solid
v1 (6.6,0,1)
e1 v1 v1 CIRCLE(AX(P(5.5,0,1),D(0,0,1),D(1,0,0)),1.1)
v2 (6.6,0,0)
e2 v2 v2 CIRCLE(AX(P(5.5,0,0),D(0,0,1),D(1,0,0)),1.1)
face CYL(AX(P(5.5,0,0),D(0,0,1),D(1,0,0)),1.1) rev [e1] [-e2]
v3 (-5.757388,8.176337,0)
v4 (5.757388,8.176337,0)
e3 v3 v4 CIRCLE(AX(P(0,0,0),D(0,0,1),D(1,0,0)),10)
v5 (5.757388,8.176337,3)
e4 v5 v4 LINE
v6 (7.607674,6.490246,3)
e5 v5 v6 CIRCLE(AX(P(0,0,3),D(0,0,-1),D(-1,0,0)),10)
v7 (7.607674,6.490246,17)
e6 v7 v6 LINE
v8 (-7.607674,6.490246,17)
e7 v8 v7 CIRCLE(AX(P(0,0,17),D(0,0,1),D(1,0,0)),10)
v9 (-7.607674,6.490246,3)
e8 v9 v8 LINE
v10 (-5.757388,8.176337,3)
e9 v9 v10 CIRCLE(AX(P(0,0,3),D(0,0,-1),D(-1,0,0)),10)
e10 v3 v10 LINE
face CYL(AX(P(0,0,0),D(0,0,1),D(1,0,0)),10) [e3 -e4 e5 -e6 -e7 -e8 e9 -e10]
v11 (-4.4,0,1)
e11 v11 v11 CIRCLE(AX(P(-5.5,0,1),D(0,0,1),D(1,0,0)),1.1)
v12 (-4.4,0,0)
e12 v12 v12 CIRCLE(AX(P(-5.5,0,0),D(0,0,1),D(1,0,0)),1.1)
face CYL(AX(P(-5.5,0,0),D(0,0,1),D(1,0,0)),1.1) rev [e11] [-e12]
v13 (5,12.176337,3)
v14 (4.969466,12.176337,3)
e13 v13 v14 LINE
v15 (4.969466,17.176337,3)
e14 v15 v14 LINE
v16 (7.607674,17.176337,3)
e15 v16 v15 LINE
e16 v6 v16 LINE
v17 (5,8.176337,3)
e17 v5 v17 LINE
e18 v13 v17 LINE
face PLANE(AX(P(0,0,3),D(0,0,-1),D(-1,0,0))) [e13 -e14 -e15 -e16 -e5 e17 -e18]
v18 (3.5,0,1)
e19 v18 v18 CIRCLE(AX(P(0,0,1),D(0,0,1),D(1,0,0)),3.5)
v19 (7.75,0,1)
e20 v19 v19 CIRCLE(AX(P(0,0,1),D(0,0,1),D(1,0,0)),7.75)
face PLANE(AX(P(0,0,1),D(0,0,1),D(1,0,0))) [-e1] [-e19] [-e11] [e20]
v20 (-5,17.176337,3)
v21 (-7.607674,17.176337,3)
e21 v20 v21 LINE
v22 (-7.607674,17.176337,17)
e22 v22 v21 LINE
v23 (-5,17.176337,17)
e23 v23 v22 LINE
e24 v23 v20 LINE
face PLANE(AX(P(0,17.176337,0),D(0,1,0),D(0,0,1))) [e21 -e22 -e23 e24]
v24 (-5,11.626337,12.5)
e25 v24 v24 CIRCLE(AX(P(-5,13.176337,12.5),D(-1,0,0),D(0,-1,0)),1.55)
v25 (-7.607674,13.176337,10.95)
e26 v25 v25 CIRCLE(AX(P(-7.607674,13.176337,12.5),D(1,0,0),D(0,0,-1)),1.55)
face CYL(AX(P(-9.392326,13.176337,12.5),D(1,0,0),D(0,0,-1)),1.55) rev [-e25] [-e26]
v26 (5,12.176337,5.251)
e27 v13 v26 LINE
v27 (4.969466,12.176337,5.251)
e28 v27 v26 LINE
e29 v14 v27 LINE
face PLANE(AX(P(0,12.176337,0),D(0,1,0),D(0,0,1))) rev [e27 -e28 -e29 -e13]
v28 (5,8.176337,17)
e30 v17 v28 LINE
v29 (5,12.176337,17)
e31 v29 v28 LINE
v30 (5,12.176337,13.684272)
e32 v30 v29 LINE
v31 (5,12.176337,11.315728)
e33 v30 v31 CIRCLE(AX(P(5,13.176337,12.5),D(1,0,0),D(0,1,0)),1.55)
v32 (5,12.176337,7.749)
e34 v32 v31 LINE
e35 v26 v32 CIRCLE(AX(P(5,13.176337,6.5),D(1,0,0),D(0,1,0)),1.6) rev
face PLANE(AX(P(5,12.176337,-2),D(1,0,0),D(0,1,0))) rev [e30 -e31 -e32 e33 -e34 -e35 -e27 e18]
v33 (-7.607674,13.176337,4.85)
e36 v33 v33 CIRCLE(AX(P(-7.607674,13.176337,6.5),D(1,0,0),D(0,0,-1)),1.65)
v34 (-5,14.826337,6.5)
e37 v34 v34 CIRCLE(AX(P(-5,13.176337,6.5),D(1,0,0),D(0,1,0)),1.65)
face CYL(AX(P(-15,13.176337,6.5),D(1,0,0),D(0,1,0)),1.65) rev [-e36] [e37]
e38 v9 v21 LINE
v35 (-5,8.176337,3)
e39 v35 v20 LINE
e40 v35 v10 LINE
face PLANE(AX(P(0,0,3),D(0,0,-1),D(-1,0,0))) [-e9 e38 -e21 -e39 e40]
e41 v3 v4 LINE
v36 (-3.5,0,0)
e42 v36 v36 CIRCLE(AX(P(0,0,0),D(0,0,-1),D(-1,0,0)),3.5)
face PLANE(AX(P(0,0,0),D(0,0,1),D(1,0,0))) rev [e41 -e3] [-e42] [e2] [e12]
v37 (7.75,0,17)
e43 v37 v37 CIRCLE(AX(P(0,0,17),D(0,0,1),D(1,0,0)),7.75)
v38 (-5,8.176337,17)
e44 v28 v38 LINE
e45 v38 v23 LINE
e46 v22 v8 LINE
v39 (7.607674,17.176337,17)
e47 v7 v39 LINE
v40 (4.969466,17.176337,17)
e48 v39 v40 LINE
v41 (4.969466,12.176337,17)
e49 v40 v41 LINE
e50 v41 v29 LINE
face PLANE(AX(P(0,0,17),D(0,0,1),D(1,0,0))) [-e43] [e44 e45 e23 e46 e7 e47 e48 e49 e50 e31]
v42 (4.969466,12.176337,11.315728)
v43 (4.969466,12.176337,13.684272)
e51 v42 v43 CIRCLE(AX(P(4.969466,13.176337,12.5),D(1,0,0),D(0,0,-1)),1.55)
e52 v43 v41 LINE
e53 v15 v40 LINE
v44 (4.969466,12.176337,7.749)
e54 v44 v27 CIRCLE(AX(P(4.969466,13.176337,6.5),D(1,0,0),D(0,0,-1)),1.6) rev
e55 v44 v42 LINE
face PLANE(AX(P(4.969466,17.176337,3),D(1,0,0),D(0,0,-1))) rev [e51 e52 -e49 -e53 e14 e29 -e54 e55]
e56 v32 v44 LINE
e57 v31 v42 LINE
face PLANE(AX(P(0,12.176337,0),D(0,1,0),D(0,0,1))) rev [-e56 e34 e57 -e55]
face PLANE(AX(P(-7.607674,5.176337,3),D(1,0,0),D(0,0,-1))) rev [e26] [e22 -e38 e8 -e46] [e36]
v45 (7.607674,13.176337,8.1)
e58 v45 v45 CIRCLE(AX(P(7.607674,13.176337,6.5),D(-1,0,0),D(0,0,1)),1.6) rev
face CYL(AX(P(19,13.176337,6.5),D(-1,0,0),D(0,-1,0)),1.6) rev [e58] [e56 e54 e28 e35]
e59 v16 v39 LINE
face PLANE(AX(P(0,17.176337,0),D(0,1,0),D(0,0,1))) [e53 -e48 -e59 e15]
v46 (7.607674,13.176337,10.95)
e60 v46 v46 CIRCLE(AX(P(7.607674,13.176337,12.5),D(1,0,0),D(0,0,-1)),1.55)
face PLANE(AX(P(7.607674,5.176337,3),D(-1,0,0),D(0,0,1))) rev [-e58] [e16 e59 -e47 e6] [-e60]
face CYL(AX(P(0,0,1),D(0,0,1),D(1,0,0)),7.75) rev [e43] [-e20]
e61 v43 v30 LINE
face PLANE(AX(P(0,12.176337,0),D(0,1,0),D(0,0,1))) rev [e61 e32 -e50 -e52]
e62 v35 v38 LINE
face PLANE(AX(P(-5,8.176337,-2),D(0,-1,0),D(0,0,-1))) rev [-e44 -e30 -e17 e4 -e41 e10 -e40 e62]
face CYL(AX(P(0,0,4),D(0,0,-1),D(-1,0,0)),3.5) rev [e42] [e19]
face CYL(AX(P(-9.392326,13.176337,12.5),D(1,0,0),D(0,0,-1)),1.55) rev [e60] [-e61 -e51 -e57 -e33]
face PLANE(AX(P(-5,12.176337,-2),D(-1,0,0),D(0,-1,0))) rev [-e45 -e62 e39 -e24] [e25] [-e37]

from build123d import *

# Parameters (mm, degrees)
SKETCH_1_R           = 14.75
EXTRUDE_1_DEPTH      = 1
SKETCH_2_R           = 1.5
CUT_EXTRUDE_1_DEPTH  = 1
SKETCH_3_R           = 1.1
CUT_EXTRUDE_2_DEPTH  = 1
SKETCH_4_R           = 3.5
CUT_EXTRUDE_3_DEPTH  = 4
SKETCH_5_OUTSIDE_W   = 39.846
SKETCH_5_OUTSIDE_H   = 39.846
SKETCH_5_OUTSIDE_R   = 7
CUT_EXTRUDE_4_DEPTH  = 10
SKETCH_6_R           = 8.75
SKETCH_6_R_2         = 6.75
EXTRUDE_1_2_DEPTH    = 10
SKETCH_7_W           = 20
SKETCH_7_H           = 5.176336695
EXTRUDE_2_DEPTH      = 9
CUT_EXTRUDE_5_DEPTH  = 2
SKETCH_9_W           = 10
SKETCH_9_H           = 4
CUT_EXTRUDE_6_DEPTH  = 12
CHAMFER_START        = 3
CHAMFER_2_DEPTH      = 7
SKETCH_10_W          = 5
SKETCH_10_H          = 7
SKETCH_10_W_2        = 5.030534445
EXTRUDE_3_DEPTH      = 5
SKETCH_11_W          = 0.39232609
SKETCH_11_H          = 7
CUT_EXTRUDE_7_DEPTH  = 22
SKETCH_12_W          = 2
SKETCH_12_H          = 7
CUT_EXTRUDE_8_DEPTH  = 12
SKETCH_13_R          = 1.65
CUT_EXTRUDE_9_DEPTH  = 10
SKETCH_14_R          = 1.6
CUT_EXTRUDE_10_DEPTH = 24
SKETCH_15_R          = 7.75
CUT_EXTRUDE_11_DEPTH = 9
SKETCH_16_R          = 7.75
EXTRUDE_4_DEPTH      = 10
SKETCH_17_W          = 18.442899184
SKETCH_17_H          = 2.260029227
CUT_EXTRUDE_12_DEPTH = 3
EXTRUDE_START        = 7
SKETCH_18_R          = 7.75
EXTRUDE_5_DEPTH      = 7
SKETCH_19_R          = 1.55
CUT_EXTRUDE_13_DEPTH = 17


with BuildPart() as part:
    # 草图1 → Extrude 1 (new body)
    with BuildSketch(Plane.XY):
        Circle(SKETCH_1_R)
    extrude(amount=EXTRUDE_1_DEPTH)

    # 草图2 → 切除-拉伸1 (cut)
    with BuildSketch(Plane.XY.offset(1)):
        with Locations((-11.5, 0)):
            Circle(SKETCH_2_R)
        with Locations((11.5, 0)):
            Circle(SKETCH_2_R)
        with Locations((0, -11.5)):
            Circle(SKETCH_2_R)
    extrude(amount=-CUT_EXTRUDE_1_DEPTH, mode=Mode.SUBTRACT)

    # 草图3 → 切除-拉伸2 (cut)
    with BuildSketch(Plane.XY.offset(1)):
        with Locations((-5.5, 0)):
            Circle(SKETCH_3_R)
        with Locations((5.5, 0)):
            Circle(SKETCH_3_R)
    extrude(amount=-CUT_EXTRUDE_2_DEPTH, mode=Mode.SUBTRACT)

    # 草图4 → 切除-拉伸3 (cut)
    with BuildSketch(Plane(origin=(0, 0, 0), x_dir=(-1, 0, 0), z_dir=(0, 0, -1))):
        Circle(SKETCH_4_R)
    extrude(amount=-CUT_EXTRUDE_3_DEPTH, mode=Mode.SUBTRACT)

    # 草图5 outside → 切除-拉伸4 (cut)
    with BuildSketch(Plane(origin=(0, 0, 0), x_dir=(-1, 0, 0), z_dir=(0, 0, -1))):
        Rectangle(SKETCH_5_OUTSIDE_W, SKETCH_5_OUTSIDE_H)
        Circle(SKETCH_5_OUTSIDE_R, mode=Mode.SUBTRACT)
    extrude(amount=-CUT_EXTRUDE_4_DEPTH, mode=Mode.SUBTRACT)

    # 草图6 → Extrude 1 2 (add)
    with BuildSketch(Plane(origin=(0, 0, 0), x_dir=(-1, 0, 0), z_dir=(0, 0, -1))):
        Circle(SKETCH_6_R)
        Circle(SKETCH_6_R_2, mode=Mode.SUBTRACT)
    extrude(amount=-EXTRUDE_1_2_DEPTH)

    # 草图7 → 凸台-拉伸2 (add)
    with BuildSketch(Plane.XY.offset(1)):
        with Locations((0, 9.588168348)):
            Rectangle(SKETCH_7_W, SKETCH_7_H)
    extrude(amount=EXTRUDE_2_DEPTH)

    # 草图8 → 切除-拉伸5 (cut)
    with BuildSketch(Plane(origin=(0, 0, 1), x_dir=(-1, 0, 0), z_dir=(0, 0, -1))):
        with BuildLine():
            Line((5.25, 7), (10, 7))
            Line((10, 7), (10, 12.176336695))
            Line((10, 12.176336695), (-10, 12.176336695))
            Line((-10, 12.176336695), (-10, 7))
            Line((-10, 7), (-5.25, 7))
            ThreePointArc((-5.25, 7), (0, 8.75), (5.25, 7))
        make_face()
    extrude(amount=-CUT_EXTRUDE_5_DEPTH, mode=Mode.SUBTRACT)

    # 草图9 → 切除-拉伸6 (cut)
    with BuildSketch(Plane.XY.offset(10)):
        with Locations((0, 10.176336695)):
            Rectangle(SKETCH_9_W, SKETCH_9_H)
    extrude(amount=-CUT_EXTRUDE_6_DEPTH, mode=Mode.SUBTRACT)

    # 倒角1
    # the kernel refuses this chamfer: 5, 3.571428571 mm, written as the material it adds along each edge
    with BuildSketch(Plane(origin=(5.25, 7, 10), x_dir=(0.718685473033907, -0.6953353082146982, 0), z_dir=(0, 0, -1))) as chamfer_1_piece_1:
        with BuildLine():
            Line((2.129047938, 0.190960276), (3.191245845, -3.221004807))
            Line((3.191245845, -3.221004807), (3.121712315, -3.292873355))
            ThreePointArc((3.121712315, -3.292873355), (1.559431919, -1.647908743), (-0.069533531, -0.071868547))
            Line((-0.069533531, -0.071868547), (0.012505696, 0.099214956))
            ThreePointArc((0.012505696, 0.099214956), (1.064301984, 0.031360517), (2.116542242, 0.290175233))
            Line((2.116542242, 0.290175233), (2.129047938, 0.190960276))
        make_face()
    extrude(amount=7)

    # 倒角2: read off the stored shape, not the designer's step
    # 倒角2 outline → 倒角2 (add)
    with BuildSketch(Plane.XY.offset(CHAMFER_START)):
        with BuildLine():
            Line((-9.60767391, 7), (-6.822840892, 5.47826087))
            ThreePointArc((-6.822840892, 5.47826087), (-6.084183947, 6.288497889), (-5.25, 7))
            Line((-5.25, 7), (-9.60767391, 7))
        make_face()
    extrude(amount=CHAMFER_2_DEPTH)

    # 草图10 → 凸台-拉伸3 (add)
    with BuildSketch(Plane(origin=(0, 12.176336695, 0), x_dir=(1, 0, 0), z_dir=(0, 1, 0))):
        with Locations((-7.5, -6.5)):
            Rectangle(SKETCH_10_W, SKETCH_10_H)
        with Locations((7.484732777, -6.5)):
            Rectangle(SKETCH_10_W_2, SKETCH_10_H)
    extrude(amount=EXTRUDE_3_DEPTH)

    # 草图11 → 切除-拉伸7 (cut)
    with BuildSketch(Plane.XZ.offset(-7)):
        with Locations((-9.803836955, 6.5)):
            Rectangle(SKETCH_11_W, SKETCH_11_H)
        with Locations((9.803836955, 6.5)):
            Rectangle(SKETCH_11_W, SKETCH_11_H)
    extrude(amount=-CUT_EXTRUDE_7_DEPTH, mode=Mode.SUBTRACT)

    # 草图12 → 切除-拉伸8 (cut)
    with BuildSketch(Plane(origin=(0, 17.176336695, 0), x_dir=(1, 0, 0), z_dir=(0, 1, 0))):
        with Locations((-8.60767391, -6.5)):
            Rectangle(SKETCH_12_W, SKETCH_12_H)
        with Locations((8.60767391, -6.5)):
            Rectangle(SKETCH_12_W, SKETCH_12_H)
    extrude(amount=-CUT_EXTRUDE_8_DEPTH, mode=Mode.SUBTRACT)

    # 草图13 → 切除-拉伸9 (cut)
    with BuildSketch(Plane(origin=(-5, 0, 0), x_dir=(0, 0, -1), z_dir=(1, 0, 0))):
        with Locations(Location((-6.5, 13.176336695, 0), (0, 0, 90))):
            Circle(SKETCH_13_R)
    extrude(amount=-CUT_EXTRUDE_9_DEPTH, mode=Mode.SUBTRACT)

    # 草图14 → 切除-拉伸10 (cut)
    with BuildSketch(Plane(origin=(-5, 0, 0), x_dir=(0, 0, -1), z_dir=(1, 0, 0))):
        with Locations(Location((-6.5, 13.176336695, 0), (0, 0, 321.317812547))):
            Circle(SKETCH_14_R)
    extrude(amount=CUT_EXTRUDE_10_DEPTH, mode=Mode.SUBTRACT)

    # 倒角3
    # the kernel refuses this chamfer: 1, 0.862080288 mm, written as the material it adds along each edge
    with BuildSketch(Plane(origin=(-6.822840892, 5.47826087, 3), x_dir=(-0.8775324532256278, 0.47951725050910476, 0), z_dir=(0, 0, 1))) as chamfer_3_piece_1_section:
        with BuildLine():
            Line((0.991009207, -0.026752196), (0.072738558, 0.799334069))
            Line((0.072738558, 0.799334069), (0.052814761, 0.801078297))
            ThreePointArc((0.052814761, 0.801078297), (0.041497623, 0.398993566), (-0.019689565, 0.00351013))
            Line((-0.019689565, 0.00351013), (0, -0.02))
            ThreePointArc((0, -0.02), (0.495504604, -0.02), (0.991009207, -0.046752196))
            Line((0.991009207, -0.046752196), (0.991009207, -0.026752196))
        make_face()
    chamfer_3_piece_1 = extrude(amount=7, mode=Mode.PRIVATE)
    chamfer_3_piece_1 = split(chamfer_3_piece_1, bisect_by=Plane(origin=(-7.60767391, 5.47826087, 3), z_dir=(1, 0, 0)), keep=Keep.TOP, mode=Mode.PRIVATE)
    add(chamfer_3_piece_1)

    # 倒角4
    # the kernel refuses this chamfer: 1, 0.862080288 mm, written as the material it adds along each edge
    with BuildSketch(Plane(origin=(6.822840893, 5.47826087, 10), x_dir=(0.5907401034808368, -0.8068619027686523, 0), z_dir=(0, 0, -1))) as chamfer_4_piece_1_section:
        with BuildLine():
            Line((0.801958261, 0.032996956), (0.103787295, -0.985922474))
            Line((0.103787295, -0.985922474), (0.083960944, -0.988552263))
            ThreePointArc((0.083960944, -0.988552263), (0.045327257, -0.49383221), (-0.019826352, -0.002629788))
            Line((-0.019826352, -0.002629788), (0.000890684, 0.019980157))
            ThreePointArc((0.000890684, 0.019980157), (0.400985832, 0.011326106), (0.801067577, 0.052977113))
            Line((0.801067577, 0.052977113), (0.801958261, 0.032996956))
        make_face()
    chamfer_4_piece_1 = extrude(amount=7, mode=Mode.PRIVATE)
    chamfer_4_piece_1 = split(chamfer_4_piece_1, bisect_by=Plane(origin=(7.60767391, 5.47826087, 10), z_dir=(-1, 0, 0)), keep=Keep.TOP, mode=Mode.PRIVATE)
    add(chamfer_4_piece_1)

    # 草图15 → 切除-拉伸11 (cut)
    with BuildSketch(Plane.XY.offset(10)):
        Circle(SKETCH_15_R)
    extrude(amount=-CUT_EXTRUDE_11_DEPTH, mode=Mode.SUBTRACT)

    # 草图16 → 凸台-拉伸4 (add)
    with BuildSketch(Plane.XY.offset(10)):
        with BuildLine():
            Line((-5, 8.660254038), (-5, 8.176336695))
            Line((-5, 8.176336695), (5, 8.176336695))
            Line((5, 8.176336695), (5, 8.660254038))
            ThreePointArc((5, 8.660254038), (0, -10), (-5, 8.660254038))
        make_face()
        Circle(SKETCH_16_R, mode=Mode.SUBTRACT)
    extrude(amount=-EXTRUDE_4_DEPTH)

    # 草图17 → 切除-拉伸12 (cut)
    with BuildSketch(Plane(origin=(0, 0, 0), x_dir=(-1, 0, 0), z_dir=(0, 0, -1))):
        with Locations((-0.125316737, 9.306351309)):
            Rectangle(SKETCH_17_W, SKETCH_17_H)
    extrude(amount=-CUT_EXTRUDE_12_DEPTH, mode=Mode.SUBTRACT)

    # 草图18 → 凸台-拉伸5 (add)
    with BuildSketch(Plane.XY.offset(10).offset(EXTRUDE_START)):
        with BuildLine():
            Line((-5, 17.176336695), (-7.60767391, 17.176336695))
            Line((-7.60767391, 17.176336695), (-7.60767391, 6.49024635))
            ThreePointArc((-7.60767391, 6.49024635), (0, -10), (7.60767391, 6.49024635))
            Line((7.60767391, 6.49024635), (7.60767391, 17.176336695))
            Line((7.60767391, 17.176336695), (4.969465555, 17.176336695))
            Line((4.969465555, 17.176336695), (4.969465555, 12.176336695))
            Line((4.969465555, 12.176336695), (5, 12.176336695))
            Line((5, 12.176336695), (5, 8.176336695))
            Line((5, 8.176336695), (-5, 8.176336695))
            Line((-5, 8.176336695), (-5, 17.176336695))
        make_face()
        Circle(SKETCH_18_R, mode=Mode.SUBTRACT)
    extrude(amount=-EXTRUDE_5_DEPTH)

    # 草图19 → 切除-拉伸13 (cut)
    with BuildSketch(Plane(origin=(7.60767391, 0, 0), x_dir=(0, 0, -1), z_dir=(1, 0, 0))):
        with Locations((-12.5, 13.176336695)):
            Circle(SKETCH_19_R)
    extrude(amount=-CUT_EXTRUDE_13_DEPTH, mode=Mode.SUBTRACT)


solid = part.part
